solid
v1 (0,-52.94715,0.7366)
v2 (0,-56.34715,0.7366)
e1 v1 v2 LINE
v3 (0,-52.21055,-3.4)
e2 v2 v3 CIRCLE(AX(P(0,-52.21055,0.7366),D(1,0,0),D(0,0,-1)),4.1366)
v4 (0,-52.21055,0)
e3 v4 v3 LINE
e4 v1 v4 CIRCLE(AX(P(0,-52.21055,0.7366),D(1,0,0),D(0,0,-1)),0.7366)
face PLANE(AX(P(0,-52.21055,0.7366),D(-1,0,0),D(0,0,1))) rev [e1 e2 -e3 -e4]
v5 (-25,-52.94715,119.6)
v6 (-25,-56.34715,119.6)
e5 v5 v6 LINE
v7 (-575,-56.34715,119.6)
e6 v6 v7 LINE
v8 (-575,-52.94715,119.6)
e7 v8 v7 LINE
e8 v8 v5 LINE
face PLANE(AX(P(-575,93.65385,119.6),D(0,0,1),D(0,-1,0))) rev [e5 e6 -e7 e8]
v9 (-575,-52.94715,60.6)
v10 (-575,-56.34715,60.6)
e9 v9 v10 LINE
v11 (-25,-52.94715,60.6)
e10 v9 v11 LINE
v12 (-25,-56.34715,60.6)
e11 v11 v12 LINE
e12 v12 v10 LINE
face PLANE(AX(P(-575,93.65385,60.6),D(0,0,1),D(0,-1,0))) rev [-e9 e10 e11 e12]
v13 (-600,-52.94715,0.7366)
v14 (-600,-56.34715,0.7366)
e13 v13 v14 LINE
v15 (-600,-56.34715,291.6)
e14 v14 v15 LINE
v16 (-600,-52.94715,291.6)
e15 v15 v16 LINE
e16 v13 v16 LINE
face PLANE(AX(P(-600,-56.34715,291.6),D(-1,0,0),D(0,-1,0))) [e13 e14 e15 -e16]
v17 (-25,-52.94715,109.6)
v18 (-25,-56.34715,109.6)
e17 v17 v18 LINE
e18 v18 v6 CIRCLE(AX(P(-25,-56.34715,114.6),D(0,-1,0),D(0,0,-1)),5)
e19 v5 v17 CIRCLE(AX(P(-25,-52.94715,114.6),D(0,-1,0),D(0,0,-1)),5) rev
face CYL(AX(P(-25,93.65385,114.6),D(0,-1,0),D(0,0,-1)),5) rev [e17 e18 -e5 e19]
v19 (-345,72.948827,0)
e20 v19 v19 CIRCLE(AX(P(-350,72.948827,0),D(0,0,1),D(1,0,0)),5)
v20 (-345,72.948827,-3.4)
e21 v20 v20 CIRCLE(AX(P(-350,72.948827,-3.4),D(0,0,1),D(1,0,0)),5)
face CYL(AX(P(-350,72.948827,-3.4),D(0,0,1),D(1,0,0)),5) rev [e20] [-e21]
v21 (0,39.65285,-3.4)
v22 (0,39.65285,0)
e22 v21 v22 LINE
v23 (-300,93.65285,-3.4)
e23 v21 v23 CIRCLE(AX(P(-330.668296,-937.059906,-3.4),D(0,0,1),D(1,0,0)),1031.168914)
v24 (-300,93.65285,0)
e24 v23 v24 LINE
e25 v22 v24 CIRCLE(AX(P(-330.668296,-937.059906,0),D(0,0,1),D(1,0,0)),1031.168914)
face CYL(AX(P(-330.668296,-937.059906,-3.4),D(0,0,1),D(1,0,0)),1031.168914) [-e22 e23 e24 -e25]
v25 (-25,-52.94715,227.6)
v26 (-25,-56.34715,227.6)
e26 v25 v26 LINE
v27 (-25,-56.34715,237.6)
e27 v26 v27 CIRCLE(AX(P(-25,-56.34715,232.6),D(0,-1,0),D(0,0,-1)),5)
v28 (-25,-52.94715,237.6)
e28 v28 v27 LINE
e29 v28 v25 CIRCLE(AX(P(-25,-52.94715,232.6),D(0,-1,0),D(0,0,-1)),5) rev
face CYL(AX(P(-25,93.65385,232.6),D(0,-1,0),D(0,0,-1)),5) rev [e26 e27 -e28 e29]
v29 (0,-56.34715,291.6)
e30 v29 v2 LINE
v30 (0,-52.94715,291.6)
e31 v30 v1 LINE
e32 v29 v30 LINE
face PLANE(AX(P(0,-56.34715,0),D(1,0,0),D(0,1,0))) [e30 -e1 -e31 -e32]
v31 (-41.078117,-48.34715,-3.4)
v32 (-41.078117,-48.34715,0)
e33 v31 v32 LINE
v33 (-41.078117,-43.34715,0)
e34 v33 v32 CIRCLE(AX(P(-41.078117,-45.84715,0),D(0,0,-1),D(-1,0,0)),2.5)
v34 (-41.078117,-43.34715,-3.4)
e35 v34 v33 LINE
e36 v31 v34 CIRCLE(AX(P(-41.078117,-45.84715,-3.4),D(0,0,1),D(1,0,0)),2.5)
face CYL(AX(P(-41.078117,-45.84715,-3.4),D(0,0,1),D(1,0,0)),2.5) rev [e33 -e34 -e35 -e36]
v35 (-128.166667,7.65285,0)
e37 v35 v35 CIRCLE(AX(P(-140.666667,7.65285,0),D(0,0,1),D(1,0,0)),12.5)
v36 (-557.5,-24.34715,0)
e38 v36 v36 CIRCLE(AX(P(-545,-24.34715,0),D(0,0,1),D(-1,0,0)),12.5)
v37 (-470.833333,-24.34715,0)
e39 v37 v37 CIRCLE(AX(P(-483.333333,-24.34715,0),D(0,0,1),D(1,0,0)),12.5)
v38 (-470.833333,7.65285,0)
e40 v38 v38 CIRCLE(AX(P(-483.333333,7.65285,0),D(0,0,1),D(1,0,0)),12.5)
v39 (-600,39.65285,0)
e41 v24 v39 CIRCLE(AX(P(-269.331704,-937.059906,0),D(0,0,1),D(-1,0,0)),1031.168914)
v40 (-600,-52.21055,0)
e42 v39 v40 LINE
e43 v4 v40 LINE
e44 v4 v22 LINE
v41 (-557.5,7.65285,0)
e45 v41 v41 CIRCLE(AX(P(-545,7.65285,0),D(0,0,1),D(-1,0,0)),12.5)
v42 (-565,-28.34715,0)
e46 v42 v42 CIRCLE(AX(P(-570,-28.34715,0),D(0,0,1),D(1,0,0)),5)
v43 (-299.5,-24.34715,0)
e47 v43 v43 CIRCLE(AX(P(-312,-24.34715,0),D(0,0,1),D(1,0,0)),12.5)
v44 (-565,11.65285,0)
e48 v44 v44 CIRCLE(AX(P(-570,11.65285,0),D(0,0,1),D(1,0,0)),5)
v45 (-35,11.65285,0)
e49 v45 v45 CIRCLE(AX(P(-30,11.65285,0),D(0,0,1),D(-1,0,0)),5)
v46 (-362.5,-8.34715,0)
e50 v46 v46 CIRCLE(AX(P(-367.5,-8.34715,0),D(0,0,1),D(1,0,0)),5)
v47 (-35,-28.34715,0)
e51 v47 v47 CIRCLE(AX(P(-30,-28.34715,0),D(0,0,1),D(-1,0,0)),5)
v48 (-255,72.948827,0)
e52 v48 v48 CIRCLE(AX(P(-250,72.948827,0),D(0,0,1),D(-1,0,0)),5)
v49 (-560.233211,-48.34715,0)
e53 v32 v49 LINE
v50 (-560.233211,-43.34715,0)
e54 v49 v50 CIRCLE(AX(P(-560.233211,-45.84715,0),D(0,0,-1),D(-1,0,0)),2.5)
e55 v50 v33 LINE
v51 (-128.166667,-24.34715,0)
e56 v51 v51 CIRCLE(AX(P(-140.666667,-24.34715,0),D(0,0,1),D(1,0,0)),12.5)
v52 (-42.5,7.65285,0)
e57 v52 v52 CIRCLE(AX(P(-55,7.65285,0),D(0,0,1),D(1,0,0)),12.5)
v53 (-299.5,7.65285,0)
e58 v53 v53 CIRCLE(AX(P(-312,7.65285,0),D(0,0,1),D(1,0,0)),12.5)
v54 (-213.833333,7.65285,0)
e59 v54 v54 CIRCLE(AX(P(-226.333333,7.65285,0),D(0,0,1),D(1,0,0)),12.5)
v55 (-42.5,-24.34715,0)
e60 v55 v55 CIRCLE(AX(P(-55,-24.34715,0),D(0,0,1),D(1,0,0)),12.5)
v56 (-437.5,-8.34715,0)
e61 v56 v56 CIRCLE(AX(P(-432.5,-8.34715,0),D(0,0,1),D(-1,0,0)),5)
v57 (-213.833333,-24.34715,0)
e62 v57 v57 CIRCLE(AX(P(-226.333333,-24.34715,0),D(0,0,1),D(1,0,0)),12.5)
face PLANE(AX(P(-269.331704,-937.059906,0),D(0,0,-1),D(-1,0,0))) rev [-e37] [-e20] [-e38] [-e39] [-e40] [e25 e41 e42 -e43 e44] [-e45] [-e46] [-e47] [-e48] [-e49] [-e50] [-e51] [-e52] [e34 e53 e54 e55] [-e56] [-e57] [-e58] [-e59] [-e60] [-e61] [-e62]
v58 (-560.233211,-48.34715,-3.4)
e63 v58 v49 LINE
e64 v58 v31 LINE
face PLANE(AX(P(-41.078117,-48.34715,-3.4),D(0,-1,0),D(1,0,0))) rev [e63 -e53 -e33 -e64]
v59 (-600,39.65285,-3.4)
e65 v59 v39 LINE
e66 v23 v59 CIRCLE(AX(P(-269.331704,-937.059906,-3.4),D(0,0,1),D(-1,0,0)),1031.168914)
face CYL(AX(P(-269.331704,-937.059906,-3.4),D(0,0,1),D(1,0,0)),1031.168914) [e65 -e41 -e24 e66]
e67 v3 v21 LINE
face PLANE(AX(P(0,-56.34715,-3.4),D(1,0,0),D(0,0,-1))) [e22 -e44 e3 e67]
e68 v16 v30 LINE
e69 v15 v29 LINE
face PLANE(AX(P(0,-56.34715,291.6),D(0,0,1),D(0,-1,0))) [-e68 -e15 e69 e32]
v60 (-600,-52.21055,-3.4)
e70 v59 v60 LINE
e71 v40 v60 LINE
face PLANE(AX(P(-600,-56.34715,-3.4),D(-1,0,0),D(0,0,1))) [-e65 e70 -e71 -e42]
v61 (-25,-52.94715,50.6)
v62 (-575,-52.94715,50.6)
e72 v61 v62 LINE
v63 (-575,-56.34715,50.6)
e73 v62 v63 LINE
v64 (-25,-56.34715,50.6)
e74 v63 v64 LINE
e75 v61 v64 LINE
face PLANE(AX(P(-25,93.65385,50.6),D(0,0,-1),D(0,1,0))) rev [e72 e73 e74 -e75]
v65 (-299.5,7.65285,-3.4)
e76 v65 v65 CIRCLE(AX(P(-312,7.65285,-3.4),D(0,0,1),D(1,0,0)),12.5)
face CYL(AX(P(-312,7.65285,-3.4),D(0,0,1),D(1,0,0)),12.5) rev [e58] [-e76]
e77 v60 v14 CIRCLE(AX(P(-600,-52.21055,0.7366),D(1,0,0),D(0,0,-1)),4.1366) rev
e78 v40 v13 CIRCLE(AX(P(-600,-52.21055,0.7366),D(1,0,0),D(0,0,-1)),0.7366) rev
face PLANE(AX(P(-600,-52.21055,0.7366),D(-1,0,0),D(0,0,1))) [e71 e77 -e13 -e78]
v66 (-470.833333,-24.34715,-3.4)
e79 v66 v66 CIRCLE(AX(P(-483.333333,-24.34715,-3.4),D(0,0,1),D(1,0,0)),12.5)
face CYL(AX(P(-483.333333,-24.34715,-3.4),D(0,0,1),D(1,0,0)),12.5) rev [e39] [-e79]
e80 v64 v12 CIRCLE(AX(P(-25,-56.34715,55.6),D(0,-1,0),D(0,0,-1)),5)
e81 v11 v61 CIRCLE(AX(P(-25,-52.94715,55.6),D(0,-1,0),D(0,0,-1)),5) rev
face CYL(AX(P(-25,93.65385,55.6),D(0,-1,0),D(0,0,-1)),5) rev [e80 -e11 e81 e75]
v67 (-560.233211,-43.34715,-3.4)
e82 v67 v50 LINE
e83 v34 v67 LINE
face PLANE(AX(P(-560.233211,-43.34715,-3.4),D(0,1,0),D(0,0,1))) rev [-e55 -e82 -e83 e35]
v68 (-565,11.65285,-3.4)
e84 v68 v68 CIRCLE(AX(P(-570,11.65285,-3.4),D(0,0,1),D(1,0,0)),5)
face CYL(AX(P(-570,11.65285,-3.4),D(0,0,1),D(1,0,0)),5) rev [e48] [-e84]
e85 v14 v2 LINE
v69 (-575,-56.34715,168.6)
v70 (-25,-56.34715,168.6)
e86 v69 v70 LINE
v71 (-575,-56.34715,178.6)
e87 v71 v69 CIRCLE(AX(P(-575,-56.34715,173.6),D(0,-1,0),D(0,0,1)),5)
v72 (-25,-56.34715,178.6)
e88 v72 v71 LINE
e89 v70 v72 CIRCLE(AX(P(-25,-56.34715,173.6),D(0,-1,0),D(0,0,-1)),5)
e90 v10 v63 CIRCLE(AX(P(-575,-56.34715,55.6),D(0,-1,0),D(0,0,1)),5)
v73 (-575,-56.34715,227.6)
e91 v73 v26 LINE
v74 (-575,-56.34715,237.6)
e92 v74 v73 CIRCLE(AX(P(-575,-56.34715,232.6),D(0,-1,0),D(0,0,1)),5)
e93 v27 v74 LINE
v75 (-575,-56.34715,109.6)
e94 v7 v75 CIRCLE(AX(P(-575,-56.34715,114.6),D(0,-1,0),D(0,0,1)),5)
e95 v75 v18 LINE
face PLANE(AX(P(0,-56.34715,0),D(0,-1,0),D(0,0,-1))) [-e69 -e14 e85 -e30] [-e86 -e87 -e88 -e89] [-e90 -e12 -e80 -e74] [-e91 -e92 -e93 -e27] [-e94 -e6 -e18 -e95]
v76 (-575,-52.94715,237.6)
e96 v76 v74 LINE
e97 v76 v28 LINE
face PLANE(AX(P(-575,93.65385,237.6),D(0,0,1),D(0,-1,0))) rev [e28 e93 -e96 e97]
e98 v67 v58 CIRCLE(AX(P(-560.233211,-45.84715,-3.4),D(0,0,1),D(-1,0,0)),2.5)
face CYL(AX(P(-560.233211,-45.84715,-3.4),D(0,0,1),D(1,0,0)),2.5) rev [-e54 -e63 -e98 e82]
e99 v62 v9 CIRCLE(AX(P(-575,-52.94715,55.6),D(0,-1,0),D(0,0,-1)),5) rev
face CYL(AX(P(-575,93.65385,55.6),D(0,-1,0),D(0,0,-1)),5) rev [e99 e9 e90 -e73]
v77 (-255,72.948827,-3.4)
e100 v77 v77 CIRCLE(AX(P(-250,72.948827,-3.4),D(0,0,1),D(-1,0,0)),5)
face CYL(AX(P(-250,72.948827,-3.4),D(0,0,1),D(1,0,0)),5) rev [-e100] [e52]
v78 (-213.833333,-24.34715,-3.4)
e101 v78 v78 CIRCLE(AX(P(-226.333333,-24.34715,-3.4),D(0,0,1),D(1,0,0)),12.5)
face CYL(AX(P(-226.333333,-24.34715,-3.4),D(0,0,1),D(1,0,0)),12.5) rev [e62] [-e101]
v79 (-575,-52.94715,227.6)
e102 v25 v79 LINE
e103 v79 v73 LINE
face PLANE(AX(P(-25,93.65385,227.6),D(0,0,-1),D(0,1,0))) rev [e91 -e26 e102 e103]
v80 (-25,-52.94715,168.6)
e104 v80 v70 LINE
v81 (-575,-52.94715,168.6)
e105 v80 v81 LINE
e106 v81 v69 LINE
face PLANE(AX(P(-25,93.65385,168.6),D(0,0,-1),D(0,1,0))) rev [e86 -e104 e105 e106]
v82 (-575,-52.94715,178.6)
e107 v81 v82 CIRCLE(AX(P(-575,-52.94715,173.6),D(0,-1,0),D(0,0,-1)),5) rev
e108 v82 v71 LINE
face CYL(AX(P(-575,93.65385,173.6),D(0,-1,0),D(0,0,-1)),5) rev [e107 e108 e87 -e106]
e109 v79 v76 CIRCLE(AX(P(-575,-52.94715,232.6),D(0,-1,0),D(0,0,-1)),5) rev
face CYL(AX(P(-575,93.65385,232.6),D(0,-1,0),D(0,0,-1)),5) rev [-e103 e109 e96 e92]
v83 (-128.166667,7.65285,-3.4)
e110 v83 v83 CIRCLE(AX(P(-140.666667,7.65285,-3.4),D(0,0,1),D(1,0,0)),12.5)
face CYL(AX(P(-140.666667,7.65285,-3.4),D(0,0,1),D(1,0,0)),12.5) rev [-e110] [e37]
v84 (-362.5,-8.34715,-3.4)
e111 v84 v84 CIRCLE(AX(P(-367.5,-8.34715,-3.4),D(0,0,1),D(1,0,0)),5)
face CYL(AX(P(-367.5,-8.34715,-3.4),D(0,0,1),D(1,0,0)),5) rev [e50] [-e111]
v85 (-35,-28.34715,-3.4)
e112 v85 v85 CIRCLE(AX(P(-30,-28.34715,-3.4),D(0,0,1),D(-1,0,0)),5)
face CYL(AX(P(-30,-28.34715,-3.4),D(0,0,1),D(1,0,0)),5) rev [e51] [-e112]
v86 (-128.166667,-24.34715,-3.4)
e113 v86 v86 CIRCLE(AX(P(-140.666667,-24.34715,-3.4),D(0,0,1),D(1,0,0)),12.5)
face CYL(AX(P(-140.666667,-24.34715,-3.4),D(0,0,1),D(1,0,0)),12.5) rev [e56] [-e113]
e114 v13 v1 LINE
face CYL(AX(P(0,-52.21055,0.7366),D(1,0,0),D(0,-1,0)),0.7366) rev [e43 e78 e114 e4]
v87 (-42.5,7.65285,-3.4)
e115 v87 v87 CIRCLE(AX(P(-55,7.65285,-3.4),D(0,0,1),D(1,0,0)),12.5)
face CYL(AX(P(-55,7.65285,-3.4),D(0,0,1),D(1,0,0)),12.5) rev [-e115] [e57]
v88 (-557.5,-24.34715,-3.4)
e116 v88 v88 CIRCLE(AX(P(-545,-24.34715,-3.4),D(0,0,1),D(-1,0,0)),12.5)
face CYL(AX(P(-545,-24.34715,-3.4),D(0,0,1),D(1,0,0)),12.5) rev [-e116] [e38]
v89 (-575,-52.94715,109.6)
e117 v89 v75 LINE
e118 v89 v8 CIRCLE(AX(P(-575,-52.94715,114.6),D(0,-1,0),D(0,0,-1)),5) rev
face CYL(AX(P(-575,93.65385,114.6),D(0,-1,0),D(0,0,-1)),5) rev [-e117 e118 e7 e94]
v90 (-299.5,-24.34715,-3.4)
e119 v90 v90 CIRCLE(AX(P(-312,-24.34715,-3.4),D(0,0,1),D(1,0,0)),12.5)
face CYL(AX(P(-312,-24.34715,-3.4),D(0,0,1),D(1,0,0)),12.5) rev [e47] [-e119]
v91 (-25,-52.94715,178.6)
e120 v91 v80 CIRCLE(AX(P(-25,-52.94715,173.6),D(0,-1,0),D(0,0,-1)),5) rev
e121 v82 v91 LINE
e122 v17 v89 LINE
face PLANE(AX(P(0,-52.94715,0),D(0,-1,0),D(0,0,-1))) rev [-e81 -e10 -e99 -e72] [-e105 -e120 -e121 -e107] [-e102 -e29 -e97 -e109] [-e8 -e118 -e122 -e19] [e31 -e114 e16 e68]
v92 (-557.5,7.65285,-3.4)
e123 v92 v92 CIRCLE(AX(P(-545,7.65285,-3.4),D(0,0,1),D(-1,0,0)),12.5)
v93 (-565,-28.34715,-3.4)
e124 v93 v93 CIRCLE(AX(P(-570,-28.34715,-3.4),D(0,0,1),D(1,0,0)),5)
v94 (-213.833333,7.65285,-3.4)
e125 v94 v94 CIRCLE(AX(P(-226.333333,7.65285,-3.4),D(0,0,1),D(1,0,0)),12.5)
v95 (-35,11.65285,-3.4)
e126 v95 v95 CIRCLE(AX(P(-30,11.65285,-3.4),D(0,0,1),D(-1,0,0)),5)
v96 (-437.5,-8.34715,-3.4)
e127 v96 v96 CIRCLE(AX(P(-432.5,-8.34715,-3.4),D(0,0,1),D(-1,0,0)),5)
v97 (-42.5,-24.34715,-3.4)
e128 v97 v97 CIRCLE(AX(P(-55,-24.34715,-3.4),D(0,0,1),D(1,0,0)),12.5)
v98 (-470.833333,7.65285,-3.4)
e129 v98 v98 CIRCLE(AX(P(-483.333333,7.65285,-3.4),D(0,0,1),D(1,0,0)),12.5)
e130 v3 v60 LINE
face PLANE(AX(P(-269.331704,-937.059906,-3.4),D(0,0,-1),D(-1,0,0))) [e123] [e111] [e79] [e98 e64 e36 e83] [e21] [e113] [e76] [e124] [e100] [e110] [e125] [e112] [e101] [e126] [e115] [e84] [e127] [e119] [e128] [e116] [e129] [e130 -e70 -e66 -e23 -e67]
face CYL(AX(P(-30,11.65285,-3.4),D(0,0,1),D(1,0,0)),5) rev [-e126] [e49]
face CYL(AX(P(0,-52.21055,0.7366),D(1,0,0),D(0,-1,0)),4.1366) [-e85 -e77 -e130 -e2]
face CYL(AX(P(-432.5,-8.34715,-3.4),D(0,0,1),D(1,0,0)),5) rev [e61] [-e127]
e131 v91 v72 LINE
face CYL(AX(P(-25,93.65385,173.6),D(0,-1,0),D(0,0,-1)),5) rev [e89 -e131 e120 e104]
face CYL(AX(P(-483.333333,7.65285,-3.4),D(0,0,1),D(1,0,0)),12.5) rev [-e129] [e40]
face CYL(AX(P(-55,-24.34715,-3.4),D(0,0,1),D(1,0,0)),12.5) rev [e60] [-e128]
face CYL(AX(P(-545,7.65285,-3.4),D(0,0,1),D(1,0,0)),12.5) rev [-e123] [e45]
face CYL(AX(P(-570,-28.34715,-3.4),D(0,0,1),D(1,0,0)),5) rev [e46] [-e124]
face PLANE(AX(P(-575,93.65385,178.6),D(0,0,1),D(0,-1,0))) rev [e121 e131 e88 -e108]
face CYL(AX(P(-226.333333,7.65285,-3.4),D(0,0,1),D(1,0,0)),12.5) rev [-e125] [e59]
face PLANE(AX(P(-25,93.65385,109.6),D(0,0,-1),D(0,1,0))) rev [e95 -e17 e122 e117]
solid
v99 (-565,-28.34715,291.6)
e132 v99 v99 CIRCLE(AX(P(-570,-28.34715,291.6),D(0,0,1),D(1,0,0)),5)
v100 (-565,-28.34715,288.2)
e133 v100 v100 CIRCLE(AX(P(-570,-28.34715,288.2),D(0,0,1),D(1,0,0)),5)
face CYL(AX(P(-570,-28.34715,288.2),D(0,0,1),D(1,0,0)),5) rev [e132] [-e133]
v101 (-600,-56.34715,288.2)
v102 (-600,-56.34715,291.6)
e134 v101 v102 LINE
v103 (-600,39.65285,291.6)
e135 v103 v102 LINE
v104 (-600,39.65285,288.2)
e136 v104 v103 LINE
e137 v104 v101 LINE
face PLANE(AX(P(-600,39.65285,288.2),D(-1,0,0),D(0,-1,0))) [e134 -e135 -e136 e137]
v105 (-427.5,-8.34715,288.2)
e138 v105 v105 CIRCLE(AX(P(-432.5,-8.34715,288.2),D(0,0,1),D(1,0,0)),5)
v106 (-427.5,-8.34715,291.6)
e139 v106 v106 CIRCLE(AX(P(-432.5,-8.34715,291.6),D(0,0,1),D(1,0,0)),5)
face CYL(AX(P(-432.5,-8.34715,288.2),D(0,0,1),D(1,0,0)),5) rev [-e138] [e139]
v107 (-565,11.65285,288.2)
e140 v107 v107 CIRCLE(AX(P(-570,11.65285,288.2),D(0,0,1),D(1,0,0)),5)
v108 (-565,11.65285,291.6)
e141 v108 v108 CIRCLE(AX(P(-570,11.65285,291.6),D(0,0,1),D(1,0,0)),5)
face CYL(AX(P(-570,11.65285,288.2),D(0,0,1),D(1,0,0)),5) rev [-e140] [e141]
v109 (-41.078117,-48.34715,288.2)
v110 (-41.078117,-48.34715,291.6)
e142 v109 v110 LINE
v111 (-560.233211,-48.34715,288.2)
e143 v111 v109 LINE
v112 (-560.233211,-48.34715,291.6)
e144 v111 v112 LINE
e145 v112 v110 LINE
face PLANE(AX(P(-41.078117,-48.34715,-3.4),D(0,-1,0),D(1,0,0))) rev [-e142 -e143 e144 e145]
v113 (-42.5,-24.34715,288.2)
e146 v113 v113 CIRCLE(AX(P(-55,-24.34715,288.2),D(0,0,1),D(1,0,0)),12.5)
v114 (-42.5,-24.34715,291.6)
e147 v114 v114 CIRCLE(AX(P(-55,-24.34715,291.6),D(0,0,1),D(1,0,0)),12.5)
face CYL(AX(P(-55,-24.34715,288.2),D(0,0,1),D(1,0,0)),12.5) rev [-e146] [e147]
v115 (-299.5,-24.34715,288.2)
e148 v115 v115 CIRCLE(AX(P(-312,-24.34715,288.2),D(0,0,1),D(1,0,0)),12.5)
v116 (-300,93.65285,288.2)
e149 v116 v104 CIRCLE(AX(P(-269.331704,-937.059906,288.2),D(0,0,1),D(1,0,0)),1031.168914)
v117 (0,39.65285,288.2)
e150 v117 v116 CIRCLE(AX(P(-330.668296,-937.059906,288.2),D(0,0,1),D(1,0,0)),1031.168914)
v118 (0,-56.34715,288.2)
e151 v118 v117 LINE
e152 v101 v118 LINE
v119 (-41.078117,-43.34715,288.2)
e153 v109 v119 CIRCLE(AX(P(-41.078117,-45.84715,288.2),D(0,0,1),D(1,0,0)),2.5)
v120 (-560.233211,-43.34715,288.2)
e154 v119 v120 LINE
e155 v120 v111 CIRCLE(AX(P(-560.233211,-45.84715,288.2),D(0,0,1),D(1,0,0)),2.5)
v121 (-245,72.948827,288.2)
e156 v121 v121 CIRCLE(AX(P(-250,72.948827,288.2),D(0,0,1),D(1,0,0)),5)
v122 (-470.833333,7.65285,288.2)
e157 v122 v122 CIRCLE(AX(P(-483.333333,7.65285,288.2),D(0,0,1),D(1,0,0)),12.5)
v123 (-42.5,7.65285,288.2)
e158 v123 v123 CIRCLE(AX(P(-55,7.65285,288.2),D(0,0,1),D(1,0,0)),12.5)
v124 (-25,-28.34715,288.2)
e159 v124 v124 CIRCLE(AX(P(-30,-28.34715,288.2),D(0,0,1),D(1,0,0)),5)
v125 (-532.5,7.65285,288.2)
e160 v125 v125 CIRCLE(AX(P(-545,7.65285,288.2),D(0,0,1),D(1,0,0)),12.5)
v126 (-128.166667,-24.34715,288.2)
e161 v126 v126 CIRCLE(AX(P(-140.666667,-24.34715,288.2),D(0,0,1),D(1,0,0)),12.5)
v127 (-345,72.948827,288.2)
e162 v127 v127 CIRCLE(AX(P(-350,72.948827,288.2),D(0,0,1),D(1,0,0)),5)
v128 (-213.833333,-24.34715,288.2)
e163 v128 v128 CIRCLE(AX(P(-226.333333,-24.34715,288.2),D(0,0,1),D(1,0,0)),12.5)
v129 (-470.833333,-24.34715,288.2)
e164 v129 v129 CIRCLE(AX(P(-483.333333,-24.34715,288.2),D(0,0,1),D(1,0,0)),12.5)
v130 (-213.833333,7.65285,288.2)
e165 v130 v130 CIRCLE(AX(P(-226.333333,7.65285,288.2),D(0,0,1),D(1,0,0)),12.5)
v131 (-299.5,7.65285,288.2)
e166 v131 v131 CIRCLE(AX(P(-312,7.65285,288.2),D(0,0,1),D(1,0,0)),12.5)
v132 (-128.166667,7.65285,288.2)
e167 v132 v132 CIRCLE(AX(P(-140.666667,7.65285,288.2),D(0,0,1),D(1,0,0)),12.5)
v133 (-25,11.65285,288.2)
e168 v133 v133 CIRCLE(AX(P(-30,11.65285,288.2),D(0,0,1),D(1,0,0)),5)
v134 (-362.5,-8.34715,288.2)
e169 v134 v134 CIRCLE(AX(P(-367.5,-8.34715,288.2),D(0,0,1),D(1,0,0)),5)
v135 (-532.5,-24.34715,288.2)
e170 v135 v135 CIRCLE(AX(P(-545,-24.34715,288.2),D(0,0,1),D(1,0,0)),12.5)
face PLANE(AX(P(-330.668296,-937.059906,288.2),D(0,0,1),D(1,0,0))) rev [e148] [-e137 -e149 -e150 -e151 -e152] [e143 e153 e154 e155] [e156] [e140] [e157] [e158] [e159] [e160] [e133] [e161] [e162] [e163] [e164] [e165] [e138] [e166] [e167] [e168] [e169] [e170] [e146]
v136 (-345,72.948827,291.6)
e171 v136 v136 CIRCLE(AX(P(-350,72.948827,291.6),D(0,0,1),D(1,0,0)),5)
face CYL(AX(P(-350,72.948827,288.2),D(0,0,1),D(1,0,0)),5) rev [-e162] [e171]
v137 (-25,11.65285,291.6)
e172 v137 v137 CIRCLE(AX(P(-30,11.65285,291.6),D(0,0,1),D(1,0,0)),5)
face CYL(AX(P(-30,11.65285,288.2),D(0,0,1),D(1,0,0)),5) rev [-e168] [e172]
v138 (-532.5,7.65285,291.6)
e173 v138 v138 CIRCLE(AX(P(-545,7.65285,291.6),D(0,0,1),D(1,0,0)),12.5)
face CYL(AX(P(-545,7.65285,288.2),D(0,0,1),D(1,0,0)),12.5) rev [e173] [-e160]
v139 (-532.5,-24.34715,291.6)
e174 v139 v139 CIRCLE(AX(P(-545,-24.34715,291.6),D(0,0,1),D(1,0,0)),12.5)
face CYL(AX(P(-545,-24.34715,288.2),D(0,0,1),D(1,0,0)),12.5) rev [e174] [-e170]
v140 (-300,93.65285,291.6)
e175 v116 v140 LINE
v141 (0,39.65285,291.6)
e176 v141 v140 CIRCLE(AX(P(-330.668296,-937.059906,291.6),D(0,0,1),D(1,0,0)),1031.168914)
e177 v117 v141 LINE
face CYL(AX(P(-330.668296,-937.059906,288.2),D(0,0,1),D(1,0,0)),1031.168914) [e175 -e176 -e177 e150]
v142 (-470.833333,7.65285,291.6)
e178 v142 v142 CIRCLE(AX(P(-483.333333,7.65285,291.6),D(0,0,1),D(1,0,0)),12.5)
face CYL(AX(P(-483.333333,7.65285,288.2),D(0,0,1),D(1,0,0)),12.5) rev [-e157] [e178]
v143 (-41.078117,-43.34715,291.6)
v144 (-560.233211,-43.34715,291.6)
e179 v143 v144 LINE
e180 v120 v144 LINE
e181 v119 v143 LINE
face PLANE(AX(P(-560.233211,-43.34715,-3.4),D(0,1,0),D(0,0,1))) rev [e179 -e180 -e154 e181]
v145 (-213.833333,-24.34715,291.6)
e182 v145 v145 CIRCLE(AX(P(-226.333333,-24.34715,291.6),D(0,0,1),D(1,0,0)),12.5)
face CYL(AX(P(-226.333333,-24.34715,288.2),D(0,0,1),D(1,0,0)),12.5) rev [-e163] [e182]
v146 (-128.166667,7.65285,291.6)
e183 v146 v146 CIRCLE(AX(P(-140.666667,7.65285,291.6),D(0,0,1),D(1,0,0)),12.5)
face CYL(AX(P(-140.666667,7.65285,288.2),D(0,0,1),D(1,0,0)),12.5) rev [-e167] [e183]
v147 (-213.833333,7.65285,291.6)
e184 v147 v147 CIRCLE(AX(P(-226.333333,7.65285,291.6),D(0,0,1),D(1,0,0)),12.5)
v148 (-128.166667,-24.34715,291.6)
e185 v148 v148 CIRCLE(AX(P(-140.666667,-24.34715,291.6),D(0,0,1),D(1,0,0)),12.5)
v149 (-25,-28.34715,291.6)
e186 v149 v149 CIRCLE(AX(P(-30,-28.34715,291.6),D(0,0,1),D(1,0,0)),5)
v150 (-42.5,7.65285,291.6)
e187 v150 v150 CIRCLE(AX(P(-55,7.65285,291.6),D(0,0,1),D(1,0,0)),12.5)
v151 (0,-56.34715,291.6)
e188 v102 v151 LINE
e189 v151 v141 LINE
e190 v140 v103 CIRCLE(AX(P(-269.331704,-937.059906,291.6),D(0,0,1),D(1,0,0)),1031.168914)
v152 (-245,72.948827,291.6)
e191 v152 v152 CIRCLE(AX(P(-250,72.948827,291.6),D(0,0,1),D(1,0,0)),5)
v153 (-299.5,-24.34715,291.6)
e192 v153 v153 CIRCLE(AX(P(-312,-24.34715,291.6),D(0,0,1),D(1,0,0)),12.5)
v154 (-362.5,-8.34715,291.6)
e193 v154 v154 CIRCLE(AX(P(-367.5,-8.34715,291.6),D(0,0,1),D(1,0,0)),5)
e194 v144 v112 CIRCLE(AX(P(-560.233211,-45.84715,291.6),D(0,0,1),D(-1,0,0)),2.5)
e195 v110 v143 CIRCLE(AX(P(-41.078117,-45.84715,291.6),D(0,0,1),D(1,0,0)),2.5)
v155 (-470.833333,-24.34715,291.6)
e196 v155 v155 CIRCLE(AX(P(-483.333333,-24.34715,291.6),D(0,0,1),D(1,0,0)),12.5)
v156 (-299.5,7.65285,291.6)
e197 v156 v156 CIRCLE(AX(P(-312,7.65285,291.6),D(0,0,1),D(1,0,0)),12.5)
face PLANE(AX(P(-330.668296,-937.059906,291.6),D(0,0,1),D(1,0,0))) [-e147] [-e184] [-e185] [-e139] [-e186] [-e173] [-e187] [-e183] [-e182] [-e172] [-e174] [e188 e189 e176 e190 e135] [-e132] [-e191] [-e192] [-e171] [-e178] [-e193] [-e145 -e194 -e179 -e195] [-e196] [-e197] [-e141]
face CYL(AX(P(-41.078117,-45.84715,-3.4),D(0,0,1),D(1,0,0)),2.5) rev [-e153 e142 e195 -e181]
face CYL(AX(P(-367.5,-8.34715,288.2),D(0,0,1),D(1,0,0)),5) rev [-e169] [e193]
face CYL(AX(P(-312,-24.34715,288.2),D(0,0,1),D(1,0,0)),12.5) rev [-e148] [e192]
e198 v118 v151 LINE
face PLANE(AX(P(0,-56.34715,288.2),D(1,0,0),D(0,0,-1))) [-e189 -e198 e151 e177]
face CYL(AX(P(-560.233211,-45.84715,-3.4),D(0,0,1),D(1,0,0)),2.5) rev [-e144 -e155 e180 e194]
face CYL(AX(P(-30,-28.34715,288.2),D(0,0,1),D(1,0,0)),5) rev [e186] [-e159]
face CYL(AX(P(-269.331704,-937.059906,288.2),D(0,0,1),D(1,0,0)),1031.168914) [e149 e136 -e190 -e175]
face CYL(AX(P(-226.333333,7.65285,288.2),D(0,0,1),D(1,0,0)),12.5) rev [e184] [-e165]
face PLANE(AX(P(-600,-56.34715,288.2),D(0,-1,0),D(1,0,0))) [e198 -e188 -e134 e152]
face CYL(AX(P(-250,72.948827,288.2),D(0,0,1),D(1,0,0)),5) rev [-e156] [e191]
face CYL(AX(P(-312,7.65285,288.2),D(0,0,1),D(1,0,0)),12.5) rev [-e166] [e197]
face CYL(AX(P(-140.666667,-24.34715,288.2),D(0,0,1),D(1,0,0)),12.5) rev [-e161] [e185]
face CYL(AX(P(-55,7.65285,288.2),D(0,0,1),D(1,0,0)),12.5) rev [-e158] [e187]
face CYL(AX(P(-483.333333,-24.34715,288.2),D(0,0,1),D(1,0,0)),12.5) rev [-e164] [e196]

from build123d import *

# Parameters (mm, degrees)
SKETCH1_R                    = 12.5
SKETCH1_R_2                  = 5
BASE_FLANGE1_DEPTH           = 3.4
EDGE_FLANGE1_STRIP_W         = 15.0732
EDGE_FLANGE1_STRIP_H         = 3.4
EDGE_FLANGE1_STRIP_CUT_DEPTH = 600
EDGE_FLANGE1_DEPTH           = 600
SKETCH9_R                    = 12.5
SKETCH9_R_2                  = 5
BASE_FLANGE3_DEPTH           = 3.4
CUT_EXTRUDE1_DEPTH           = 3.4
CUT_EXTRUDE2_DEPTH           = 676.126548333
LPATTERN1_COUNT              = 4
LPATTERN1_PITCH              = 59


# Sheet-metal steps are written as plain solids
with BuildPart() as part:
    # Sketch1 → Base-Flange1 (new body)
    with BuildSketch(Plane.XY):
        with BuildLine():
            Line((0, -56.347150259), (0, 39.652849741))
            ThreePointArc((0, 39.652849741), (-147.993631147, 77.79934337), (-300, 93.652849741))
            ThreePointArc((-300, 93.652849741), (-452.006368853, 77.79934337), (-600, 39.652849741))
            Line((-600, 39.652849741), (-600, -56.347150259))
            Line((-600, -56.347150259), (0, -56.347150259))
        make_face()
        with Locations((-55, 7.652849741)):
            Circle(SKETCH1_R, mode=Mode.SUBTRACT)
        with Locations((-55, -24.347150259)):
            Circle(SKETCH1_R, mode=Mode.SUBTRACT)
        with Locations(Location((-545, 7.652849741, 0), (0, 0, 180))):
            Circle(SKETCH1_R, mode=Mode.SUBTRACT)
        with Locations(Location((-545, -24.347150259, 0), (0, 0, 180))):
            Circle(SKETCH1_R, mode=Mode.SUBTRACT)
        with Locations((-140.666666667, 7.652849741)):
            Circle(SKETCH1_R, mode=Mode.SUBTRACT)
        with Locations((-140.666666667, -24.347150259)):
            Circle(SKETCH1_R, mode=Mode.SUBTRACT)
        with Locations((-226.333333333, 7.652849741)):
            Circle(SKETCH1_R, mode=Mode.SUBTRACT)
        with Locations((-226.333333333, -24.347150259)):
            Circle(SKETCH1_R, mode=Mode.SUBTRACT)
        with Locations((-312, 7.652849741)):
            Circle(SKETCH1_R, mode=Mode.SUBTRACT)
        with Locations((-312, -24.347150259)):
            Circle(SKETCH1_R, mode=Mode.SUBTRACT)
        with Locations((-483.333333333, 7.652849741)):
            Circle(SKETCH1_R, mode=Mode.SUBTRACT)
        with Locations((-483.333333333, -24.347150259)):
            Circle(SKETCH1_R, mode=Mode.SUBTRACT)
        with Locations((-350, 72.948827057)):
            Circle(SKETCH1_R_2, mode=Mode.SUBTRACT)
        with Locations(Location((-250, 72.948827057, 0), (0, 0, 180))):
            Circle(SKETCH1_R_2, mode=Mode.SUBTRACT)
        with Locations(Location((-30, 11.652849741, 0), (0, 0, 180))):
            Circle(SKETCH1_R_2, mode=Mode.SUBTRACT)
        with Locations(Location((-30, -28.347150259, 0), (0, 0, 180))):
            Circle(SKETCH1_R_2, mode=Mode.SUBTRACT)
        with Locations((-570, -28.347150259)):
            Circle(SKETCH1_R_2, mode=Mode.SUBTRACT)
        with Locations((-570, 11.652849741)):
            Circle(SKETCH1_R_2, mode=Mode.SUBTRACT)
        with Locations((-367.5, -8.347150259)):
            Circle(SKETCH1_R_2, mode=Mode.SUBTRACT)
        with Locations(Location((-432.5, -8.347150259, 0), (0, 0, 180))):
            Circle(SKETCH1_R_2, mode=Mode.SUBTRACT)
    extrude(amount=-BASE_FLANGE1_DEPTH)

    # Edge-Flange1 strip (across the edge) → Edge-Flange1 strip cut (cut)
    with BuildSketch(Plane(origin=(-600, -56.347150259, 0), x_dir=(0, 1, 0), z_dir=(1, 0, 0))):
        with Locations((-3.4, -1.7)):
            Rectangle(EDGE_FLANGE1_STRIP_W, EDGE_FLANGE1_STRIP_H)
    extrude(amount=EDGE_FLANGE1_STRIP_CUT_DEPTH, mode=Mode.SUBTRACT)

    # Edge-Flange1 section (across the edge) → Edge-Flange1 (add)
    with BuildSketch(Plane(origin=(-600, -56.347150259, 0), x_dir=(0, 1, 0), z_dir=(1, 0, 0))):
        with BuildLine():
            Line((0, 0.7366), (0, 291.6))
            Line((0, 291.6), (3.4, 291.6))
            Line((3.4, 291.6), (3.4, 0.7366))
            ThreePointArc((3.4, 0.7366), (3.615745145, 0.215745145), (4.1366, 0))
            Line((4.1366, 0), (4.1366, -3.4))
            ThreePointArc((4.1366, -3.4), (1.211582089, -2.188417911), (0, 0.7366))
        make_face()
    extrude(amount=EDGE_FLANGE1_DEPTH)

    # Sketch10 → Cut-Extrude1 (cut)
    with BuildSketch(Plane.XZ.offset(56.347150259)):
        with BuildLine():
            Line((-575, 237.6), (-25, 237.6))
            ThreePointArc((-25, 237.6), (-20, 232.6), (-25, 227.6))
            Line((-25, 227.6), (-575, 227.6))
            ThreePointArc((-575, 227.6), (-580, 232.6), (-575, 237.6))
        make_face()
    cut_extrude1 = extrude(amount=-CUT_EXTRUDE1_DEPTH, mode=Mode.SUBTRACT)


with BuildPart() as body_2:
    # Sketch9 → Base-Flange3 (new body)
    with BuildSketch(Plane.XY.offset(291.6)):
        with BuildLine():
            Line((0, -56.347150259), (0, 39.652849741))
            ThreePointArc((0, 39.652849741), (-147.993631147, 77.79934337), (-300, 93.652849741))
            ThreePointArc((-300, 93.652849741), (-452.006368853, 77.79934337), (-600, 39.652849741))
            Line((-600, 39.652849741), (-600, -56.347150259))
            Line((-600, -56.347150259), (0, -56.347150259))
        make_face()
        with Locations((-545, 7.652849741)):
            Circle(SKETCH9_R, mode=Mode.SUBTRACT)
        with Locations((-55, -24.347150259)):
            Circle(SKETCH9_R, mode=Mode.SUBTRACT)
        with Locations((-55, 7.652849741)):
            Circle(SKETCH9_R, mode=Mode.SUBTRACT)
        with Locations((-312, -24.347150259)):
            Circle(SKETCH9_R, mode=Mode.SUBTRACT)
        with Locations((-312, 7.652849741)):
            Circle(SKETCH9_R, mode=Mode.SUBTRACT)
        with Locations((-226.333333333, -24.347150259)):
            Circle(SKETCH9_R, mode=Mode.SUBTRACT)
        with Locations((-226.333333333, 7.652849741)):
            Circle(SKETCH9_R, mode=Mode.SUBTRACT)
        with Locations((-140.666666667, -24.347150259)):
            Circle(SKETCH9_R, mode=Mode.SUBTRACT)
        with Locations((-140.666666667, 7.652849741)):
            Circle(SKETCH9_R, mode=Mode.SUBTRACT)
        with Locations((-545, -24.347150259)):
            Circle(SKETCH9_R, mode=Mode.SUBTRACT)
        with Locations((-483.333333333, -24.347150259)):
            Circle(SKETCH9_R, mode=Mode.SUBTRACT)
        with Locations((-483.333333333, 7.652849741)):
            Circle(SKETCH9_R, mode=Mode.SUBTRACT)
        with Locations((-350, 72.948827057)):
            Circle(SKETCH9_R_2, mode=Mode.SUBTRACT)
        with Locations((-250, 72.948827057)):
            Circle(SKETCH9_R_2, mode=Mode.SUBTRACT)
        with Locations((-30, 11.652849741)):
            Circle(SKETCH9_R_2, mode=Mode.SUBTRACT)
        with Locations((-30, -28.347150259)):
            Circle(SKETCH9_R_2, mode=Mode.SUBTRACT)
        with Locations((-570, -28.347150259)):
            Circle(SKETCH9_R_2, mode=Mode.SUBTRACT)
        with Locations((-570, 11.652849741)):
            Circle(SKETCH9_R_2, mode=Mode.SUBTRACT)
        with Locations((-432.5, -8.347150259)):
            Circle(SKETCH9_R_2, mode=Mode.SUBTRACT)
        with Locations((-367.5, -8.347150259)):
            Circle(SKETCH9_R_2, mode=Mode.SUBTRACT)
    extrude(amount=-BASE_FLANGE3_DEPTH)


with BuildPart() as cut_extrude2_tool:
    # Sketch11 → Cut-Extrude2 (new, through all)
    with BuildSketch(Plane.XY.offset(291.6)):
        with BuildLine():
            Line((-560.23321105, -43.347150259), (-41.078117015, -43.347150259))
            ThreePointArc((-41.078117015, -43.347150259), (-38.578117015, -45.847150259), (-41.078117015, -48.347150259))
            Line((-41.078117015, -48.347150259), (-560.23321105, -48.347150259))
            ThreePointArc((-560.23321105, -48.347150259), (-562.73321105, -45.847150259), (-560.23321105, -43.347150259))
        make_face()
    extrude(amount=-CUT_EXTRUDE2_DEPTH)


with BuildPart() as part_1:
    add(part.part)

    # Cut-Extrude2: cut by cut_extrude2_tool
    add(cut_extrude2_tool.part, mode=Mode.SUBTRACT)

    # LPattern1: Cut-Extrude1 ×4
    with Locations(*[(0, 0, -i * LPATTERN1_PITCH) for i in range(1, LPATTERN1_COUNT)]):
        add(cut_extrude1, mode=Mode.SUBTRACT)


with BuildPart() as body_2_1:
    add(body_2.part)

    # Cut-Extrude2: cut by cut_extrude2_tool
    add(cut_extrude2_tool.part, mode=Mode.SUBTRACT)


solid = Compound([part_1.part, body_2_1.part])
